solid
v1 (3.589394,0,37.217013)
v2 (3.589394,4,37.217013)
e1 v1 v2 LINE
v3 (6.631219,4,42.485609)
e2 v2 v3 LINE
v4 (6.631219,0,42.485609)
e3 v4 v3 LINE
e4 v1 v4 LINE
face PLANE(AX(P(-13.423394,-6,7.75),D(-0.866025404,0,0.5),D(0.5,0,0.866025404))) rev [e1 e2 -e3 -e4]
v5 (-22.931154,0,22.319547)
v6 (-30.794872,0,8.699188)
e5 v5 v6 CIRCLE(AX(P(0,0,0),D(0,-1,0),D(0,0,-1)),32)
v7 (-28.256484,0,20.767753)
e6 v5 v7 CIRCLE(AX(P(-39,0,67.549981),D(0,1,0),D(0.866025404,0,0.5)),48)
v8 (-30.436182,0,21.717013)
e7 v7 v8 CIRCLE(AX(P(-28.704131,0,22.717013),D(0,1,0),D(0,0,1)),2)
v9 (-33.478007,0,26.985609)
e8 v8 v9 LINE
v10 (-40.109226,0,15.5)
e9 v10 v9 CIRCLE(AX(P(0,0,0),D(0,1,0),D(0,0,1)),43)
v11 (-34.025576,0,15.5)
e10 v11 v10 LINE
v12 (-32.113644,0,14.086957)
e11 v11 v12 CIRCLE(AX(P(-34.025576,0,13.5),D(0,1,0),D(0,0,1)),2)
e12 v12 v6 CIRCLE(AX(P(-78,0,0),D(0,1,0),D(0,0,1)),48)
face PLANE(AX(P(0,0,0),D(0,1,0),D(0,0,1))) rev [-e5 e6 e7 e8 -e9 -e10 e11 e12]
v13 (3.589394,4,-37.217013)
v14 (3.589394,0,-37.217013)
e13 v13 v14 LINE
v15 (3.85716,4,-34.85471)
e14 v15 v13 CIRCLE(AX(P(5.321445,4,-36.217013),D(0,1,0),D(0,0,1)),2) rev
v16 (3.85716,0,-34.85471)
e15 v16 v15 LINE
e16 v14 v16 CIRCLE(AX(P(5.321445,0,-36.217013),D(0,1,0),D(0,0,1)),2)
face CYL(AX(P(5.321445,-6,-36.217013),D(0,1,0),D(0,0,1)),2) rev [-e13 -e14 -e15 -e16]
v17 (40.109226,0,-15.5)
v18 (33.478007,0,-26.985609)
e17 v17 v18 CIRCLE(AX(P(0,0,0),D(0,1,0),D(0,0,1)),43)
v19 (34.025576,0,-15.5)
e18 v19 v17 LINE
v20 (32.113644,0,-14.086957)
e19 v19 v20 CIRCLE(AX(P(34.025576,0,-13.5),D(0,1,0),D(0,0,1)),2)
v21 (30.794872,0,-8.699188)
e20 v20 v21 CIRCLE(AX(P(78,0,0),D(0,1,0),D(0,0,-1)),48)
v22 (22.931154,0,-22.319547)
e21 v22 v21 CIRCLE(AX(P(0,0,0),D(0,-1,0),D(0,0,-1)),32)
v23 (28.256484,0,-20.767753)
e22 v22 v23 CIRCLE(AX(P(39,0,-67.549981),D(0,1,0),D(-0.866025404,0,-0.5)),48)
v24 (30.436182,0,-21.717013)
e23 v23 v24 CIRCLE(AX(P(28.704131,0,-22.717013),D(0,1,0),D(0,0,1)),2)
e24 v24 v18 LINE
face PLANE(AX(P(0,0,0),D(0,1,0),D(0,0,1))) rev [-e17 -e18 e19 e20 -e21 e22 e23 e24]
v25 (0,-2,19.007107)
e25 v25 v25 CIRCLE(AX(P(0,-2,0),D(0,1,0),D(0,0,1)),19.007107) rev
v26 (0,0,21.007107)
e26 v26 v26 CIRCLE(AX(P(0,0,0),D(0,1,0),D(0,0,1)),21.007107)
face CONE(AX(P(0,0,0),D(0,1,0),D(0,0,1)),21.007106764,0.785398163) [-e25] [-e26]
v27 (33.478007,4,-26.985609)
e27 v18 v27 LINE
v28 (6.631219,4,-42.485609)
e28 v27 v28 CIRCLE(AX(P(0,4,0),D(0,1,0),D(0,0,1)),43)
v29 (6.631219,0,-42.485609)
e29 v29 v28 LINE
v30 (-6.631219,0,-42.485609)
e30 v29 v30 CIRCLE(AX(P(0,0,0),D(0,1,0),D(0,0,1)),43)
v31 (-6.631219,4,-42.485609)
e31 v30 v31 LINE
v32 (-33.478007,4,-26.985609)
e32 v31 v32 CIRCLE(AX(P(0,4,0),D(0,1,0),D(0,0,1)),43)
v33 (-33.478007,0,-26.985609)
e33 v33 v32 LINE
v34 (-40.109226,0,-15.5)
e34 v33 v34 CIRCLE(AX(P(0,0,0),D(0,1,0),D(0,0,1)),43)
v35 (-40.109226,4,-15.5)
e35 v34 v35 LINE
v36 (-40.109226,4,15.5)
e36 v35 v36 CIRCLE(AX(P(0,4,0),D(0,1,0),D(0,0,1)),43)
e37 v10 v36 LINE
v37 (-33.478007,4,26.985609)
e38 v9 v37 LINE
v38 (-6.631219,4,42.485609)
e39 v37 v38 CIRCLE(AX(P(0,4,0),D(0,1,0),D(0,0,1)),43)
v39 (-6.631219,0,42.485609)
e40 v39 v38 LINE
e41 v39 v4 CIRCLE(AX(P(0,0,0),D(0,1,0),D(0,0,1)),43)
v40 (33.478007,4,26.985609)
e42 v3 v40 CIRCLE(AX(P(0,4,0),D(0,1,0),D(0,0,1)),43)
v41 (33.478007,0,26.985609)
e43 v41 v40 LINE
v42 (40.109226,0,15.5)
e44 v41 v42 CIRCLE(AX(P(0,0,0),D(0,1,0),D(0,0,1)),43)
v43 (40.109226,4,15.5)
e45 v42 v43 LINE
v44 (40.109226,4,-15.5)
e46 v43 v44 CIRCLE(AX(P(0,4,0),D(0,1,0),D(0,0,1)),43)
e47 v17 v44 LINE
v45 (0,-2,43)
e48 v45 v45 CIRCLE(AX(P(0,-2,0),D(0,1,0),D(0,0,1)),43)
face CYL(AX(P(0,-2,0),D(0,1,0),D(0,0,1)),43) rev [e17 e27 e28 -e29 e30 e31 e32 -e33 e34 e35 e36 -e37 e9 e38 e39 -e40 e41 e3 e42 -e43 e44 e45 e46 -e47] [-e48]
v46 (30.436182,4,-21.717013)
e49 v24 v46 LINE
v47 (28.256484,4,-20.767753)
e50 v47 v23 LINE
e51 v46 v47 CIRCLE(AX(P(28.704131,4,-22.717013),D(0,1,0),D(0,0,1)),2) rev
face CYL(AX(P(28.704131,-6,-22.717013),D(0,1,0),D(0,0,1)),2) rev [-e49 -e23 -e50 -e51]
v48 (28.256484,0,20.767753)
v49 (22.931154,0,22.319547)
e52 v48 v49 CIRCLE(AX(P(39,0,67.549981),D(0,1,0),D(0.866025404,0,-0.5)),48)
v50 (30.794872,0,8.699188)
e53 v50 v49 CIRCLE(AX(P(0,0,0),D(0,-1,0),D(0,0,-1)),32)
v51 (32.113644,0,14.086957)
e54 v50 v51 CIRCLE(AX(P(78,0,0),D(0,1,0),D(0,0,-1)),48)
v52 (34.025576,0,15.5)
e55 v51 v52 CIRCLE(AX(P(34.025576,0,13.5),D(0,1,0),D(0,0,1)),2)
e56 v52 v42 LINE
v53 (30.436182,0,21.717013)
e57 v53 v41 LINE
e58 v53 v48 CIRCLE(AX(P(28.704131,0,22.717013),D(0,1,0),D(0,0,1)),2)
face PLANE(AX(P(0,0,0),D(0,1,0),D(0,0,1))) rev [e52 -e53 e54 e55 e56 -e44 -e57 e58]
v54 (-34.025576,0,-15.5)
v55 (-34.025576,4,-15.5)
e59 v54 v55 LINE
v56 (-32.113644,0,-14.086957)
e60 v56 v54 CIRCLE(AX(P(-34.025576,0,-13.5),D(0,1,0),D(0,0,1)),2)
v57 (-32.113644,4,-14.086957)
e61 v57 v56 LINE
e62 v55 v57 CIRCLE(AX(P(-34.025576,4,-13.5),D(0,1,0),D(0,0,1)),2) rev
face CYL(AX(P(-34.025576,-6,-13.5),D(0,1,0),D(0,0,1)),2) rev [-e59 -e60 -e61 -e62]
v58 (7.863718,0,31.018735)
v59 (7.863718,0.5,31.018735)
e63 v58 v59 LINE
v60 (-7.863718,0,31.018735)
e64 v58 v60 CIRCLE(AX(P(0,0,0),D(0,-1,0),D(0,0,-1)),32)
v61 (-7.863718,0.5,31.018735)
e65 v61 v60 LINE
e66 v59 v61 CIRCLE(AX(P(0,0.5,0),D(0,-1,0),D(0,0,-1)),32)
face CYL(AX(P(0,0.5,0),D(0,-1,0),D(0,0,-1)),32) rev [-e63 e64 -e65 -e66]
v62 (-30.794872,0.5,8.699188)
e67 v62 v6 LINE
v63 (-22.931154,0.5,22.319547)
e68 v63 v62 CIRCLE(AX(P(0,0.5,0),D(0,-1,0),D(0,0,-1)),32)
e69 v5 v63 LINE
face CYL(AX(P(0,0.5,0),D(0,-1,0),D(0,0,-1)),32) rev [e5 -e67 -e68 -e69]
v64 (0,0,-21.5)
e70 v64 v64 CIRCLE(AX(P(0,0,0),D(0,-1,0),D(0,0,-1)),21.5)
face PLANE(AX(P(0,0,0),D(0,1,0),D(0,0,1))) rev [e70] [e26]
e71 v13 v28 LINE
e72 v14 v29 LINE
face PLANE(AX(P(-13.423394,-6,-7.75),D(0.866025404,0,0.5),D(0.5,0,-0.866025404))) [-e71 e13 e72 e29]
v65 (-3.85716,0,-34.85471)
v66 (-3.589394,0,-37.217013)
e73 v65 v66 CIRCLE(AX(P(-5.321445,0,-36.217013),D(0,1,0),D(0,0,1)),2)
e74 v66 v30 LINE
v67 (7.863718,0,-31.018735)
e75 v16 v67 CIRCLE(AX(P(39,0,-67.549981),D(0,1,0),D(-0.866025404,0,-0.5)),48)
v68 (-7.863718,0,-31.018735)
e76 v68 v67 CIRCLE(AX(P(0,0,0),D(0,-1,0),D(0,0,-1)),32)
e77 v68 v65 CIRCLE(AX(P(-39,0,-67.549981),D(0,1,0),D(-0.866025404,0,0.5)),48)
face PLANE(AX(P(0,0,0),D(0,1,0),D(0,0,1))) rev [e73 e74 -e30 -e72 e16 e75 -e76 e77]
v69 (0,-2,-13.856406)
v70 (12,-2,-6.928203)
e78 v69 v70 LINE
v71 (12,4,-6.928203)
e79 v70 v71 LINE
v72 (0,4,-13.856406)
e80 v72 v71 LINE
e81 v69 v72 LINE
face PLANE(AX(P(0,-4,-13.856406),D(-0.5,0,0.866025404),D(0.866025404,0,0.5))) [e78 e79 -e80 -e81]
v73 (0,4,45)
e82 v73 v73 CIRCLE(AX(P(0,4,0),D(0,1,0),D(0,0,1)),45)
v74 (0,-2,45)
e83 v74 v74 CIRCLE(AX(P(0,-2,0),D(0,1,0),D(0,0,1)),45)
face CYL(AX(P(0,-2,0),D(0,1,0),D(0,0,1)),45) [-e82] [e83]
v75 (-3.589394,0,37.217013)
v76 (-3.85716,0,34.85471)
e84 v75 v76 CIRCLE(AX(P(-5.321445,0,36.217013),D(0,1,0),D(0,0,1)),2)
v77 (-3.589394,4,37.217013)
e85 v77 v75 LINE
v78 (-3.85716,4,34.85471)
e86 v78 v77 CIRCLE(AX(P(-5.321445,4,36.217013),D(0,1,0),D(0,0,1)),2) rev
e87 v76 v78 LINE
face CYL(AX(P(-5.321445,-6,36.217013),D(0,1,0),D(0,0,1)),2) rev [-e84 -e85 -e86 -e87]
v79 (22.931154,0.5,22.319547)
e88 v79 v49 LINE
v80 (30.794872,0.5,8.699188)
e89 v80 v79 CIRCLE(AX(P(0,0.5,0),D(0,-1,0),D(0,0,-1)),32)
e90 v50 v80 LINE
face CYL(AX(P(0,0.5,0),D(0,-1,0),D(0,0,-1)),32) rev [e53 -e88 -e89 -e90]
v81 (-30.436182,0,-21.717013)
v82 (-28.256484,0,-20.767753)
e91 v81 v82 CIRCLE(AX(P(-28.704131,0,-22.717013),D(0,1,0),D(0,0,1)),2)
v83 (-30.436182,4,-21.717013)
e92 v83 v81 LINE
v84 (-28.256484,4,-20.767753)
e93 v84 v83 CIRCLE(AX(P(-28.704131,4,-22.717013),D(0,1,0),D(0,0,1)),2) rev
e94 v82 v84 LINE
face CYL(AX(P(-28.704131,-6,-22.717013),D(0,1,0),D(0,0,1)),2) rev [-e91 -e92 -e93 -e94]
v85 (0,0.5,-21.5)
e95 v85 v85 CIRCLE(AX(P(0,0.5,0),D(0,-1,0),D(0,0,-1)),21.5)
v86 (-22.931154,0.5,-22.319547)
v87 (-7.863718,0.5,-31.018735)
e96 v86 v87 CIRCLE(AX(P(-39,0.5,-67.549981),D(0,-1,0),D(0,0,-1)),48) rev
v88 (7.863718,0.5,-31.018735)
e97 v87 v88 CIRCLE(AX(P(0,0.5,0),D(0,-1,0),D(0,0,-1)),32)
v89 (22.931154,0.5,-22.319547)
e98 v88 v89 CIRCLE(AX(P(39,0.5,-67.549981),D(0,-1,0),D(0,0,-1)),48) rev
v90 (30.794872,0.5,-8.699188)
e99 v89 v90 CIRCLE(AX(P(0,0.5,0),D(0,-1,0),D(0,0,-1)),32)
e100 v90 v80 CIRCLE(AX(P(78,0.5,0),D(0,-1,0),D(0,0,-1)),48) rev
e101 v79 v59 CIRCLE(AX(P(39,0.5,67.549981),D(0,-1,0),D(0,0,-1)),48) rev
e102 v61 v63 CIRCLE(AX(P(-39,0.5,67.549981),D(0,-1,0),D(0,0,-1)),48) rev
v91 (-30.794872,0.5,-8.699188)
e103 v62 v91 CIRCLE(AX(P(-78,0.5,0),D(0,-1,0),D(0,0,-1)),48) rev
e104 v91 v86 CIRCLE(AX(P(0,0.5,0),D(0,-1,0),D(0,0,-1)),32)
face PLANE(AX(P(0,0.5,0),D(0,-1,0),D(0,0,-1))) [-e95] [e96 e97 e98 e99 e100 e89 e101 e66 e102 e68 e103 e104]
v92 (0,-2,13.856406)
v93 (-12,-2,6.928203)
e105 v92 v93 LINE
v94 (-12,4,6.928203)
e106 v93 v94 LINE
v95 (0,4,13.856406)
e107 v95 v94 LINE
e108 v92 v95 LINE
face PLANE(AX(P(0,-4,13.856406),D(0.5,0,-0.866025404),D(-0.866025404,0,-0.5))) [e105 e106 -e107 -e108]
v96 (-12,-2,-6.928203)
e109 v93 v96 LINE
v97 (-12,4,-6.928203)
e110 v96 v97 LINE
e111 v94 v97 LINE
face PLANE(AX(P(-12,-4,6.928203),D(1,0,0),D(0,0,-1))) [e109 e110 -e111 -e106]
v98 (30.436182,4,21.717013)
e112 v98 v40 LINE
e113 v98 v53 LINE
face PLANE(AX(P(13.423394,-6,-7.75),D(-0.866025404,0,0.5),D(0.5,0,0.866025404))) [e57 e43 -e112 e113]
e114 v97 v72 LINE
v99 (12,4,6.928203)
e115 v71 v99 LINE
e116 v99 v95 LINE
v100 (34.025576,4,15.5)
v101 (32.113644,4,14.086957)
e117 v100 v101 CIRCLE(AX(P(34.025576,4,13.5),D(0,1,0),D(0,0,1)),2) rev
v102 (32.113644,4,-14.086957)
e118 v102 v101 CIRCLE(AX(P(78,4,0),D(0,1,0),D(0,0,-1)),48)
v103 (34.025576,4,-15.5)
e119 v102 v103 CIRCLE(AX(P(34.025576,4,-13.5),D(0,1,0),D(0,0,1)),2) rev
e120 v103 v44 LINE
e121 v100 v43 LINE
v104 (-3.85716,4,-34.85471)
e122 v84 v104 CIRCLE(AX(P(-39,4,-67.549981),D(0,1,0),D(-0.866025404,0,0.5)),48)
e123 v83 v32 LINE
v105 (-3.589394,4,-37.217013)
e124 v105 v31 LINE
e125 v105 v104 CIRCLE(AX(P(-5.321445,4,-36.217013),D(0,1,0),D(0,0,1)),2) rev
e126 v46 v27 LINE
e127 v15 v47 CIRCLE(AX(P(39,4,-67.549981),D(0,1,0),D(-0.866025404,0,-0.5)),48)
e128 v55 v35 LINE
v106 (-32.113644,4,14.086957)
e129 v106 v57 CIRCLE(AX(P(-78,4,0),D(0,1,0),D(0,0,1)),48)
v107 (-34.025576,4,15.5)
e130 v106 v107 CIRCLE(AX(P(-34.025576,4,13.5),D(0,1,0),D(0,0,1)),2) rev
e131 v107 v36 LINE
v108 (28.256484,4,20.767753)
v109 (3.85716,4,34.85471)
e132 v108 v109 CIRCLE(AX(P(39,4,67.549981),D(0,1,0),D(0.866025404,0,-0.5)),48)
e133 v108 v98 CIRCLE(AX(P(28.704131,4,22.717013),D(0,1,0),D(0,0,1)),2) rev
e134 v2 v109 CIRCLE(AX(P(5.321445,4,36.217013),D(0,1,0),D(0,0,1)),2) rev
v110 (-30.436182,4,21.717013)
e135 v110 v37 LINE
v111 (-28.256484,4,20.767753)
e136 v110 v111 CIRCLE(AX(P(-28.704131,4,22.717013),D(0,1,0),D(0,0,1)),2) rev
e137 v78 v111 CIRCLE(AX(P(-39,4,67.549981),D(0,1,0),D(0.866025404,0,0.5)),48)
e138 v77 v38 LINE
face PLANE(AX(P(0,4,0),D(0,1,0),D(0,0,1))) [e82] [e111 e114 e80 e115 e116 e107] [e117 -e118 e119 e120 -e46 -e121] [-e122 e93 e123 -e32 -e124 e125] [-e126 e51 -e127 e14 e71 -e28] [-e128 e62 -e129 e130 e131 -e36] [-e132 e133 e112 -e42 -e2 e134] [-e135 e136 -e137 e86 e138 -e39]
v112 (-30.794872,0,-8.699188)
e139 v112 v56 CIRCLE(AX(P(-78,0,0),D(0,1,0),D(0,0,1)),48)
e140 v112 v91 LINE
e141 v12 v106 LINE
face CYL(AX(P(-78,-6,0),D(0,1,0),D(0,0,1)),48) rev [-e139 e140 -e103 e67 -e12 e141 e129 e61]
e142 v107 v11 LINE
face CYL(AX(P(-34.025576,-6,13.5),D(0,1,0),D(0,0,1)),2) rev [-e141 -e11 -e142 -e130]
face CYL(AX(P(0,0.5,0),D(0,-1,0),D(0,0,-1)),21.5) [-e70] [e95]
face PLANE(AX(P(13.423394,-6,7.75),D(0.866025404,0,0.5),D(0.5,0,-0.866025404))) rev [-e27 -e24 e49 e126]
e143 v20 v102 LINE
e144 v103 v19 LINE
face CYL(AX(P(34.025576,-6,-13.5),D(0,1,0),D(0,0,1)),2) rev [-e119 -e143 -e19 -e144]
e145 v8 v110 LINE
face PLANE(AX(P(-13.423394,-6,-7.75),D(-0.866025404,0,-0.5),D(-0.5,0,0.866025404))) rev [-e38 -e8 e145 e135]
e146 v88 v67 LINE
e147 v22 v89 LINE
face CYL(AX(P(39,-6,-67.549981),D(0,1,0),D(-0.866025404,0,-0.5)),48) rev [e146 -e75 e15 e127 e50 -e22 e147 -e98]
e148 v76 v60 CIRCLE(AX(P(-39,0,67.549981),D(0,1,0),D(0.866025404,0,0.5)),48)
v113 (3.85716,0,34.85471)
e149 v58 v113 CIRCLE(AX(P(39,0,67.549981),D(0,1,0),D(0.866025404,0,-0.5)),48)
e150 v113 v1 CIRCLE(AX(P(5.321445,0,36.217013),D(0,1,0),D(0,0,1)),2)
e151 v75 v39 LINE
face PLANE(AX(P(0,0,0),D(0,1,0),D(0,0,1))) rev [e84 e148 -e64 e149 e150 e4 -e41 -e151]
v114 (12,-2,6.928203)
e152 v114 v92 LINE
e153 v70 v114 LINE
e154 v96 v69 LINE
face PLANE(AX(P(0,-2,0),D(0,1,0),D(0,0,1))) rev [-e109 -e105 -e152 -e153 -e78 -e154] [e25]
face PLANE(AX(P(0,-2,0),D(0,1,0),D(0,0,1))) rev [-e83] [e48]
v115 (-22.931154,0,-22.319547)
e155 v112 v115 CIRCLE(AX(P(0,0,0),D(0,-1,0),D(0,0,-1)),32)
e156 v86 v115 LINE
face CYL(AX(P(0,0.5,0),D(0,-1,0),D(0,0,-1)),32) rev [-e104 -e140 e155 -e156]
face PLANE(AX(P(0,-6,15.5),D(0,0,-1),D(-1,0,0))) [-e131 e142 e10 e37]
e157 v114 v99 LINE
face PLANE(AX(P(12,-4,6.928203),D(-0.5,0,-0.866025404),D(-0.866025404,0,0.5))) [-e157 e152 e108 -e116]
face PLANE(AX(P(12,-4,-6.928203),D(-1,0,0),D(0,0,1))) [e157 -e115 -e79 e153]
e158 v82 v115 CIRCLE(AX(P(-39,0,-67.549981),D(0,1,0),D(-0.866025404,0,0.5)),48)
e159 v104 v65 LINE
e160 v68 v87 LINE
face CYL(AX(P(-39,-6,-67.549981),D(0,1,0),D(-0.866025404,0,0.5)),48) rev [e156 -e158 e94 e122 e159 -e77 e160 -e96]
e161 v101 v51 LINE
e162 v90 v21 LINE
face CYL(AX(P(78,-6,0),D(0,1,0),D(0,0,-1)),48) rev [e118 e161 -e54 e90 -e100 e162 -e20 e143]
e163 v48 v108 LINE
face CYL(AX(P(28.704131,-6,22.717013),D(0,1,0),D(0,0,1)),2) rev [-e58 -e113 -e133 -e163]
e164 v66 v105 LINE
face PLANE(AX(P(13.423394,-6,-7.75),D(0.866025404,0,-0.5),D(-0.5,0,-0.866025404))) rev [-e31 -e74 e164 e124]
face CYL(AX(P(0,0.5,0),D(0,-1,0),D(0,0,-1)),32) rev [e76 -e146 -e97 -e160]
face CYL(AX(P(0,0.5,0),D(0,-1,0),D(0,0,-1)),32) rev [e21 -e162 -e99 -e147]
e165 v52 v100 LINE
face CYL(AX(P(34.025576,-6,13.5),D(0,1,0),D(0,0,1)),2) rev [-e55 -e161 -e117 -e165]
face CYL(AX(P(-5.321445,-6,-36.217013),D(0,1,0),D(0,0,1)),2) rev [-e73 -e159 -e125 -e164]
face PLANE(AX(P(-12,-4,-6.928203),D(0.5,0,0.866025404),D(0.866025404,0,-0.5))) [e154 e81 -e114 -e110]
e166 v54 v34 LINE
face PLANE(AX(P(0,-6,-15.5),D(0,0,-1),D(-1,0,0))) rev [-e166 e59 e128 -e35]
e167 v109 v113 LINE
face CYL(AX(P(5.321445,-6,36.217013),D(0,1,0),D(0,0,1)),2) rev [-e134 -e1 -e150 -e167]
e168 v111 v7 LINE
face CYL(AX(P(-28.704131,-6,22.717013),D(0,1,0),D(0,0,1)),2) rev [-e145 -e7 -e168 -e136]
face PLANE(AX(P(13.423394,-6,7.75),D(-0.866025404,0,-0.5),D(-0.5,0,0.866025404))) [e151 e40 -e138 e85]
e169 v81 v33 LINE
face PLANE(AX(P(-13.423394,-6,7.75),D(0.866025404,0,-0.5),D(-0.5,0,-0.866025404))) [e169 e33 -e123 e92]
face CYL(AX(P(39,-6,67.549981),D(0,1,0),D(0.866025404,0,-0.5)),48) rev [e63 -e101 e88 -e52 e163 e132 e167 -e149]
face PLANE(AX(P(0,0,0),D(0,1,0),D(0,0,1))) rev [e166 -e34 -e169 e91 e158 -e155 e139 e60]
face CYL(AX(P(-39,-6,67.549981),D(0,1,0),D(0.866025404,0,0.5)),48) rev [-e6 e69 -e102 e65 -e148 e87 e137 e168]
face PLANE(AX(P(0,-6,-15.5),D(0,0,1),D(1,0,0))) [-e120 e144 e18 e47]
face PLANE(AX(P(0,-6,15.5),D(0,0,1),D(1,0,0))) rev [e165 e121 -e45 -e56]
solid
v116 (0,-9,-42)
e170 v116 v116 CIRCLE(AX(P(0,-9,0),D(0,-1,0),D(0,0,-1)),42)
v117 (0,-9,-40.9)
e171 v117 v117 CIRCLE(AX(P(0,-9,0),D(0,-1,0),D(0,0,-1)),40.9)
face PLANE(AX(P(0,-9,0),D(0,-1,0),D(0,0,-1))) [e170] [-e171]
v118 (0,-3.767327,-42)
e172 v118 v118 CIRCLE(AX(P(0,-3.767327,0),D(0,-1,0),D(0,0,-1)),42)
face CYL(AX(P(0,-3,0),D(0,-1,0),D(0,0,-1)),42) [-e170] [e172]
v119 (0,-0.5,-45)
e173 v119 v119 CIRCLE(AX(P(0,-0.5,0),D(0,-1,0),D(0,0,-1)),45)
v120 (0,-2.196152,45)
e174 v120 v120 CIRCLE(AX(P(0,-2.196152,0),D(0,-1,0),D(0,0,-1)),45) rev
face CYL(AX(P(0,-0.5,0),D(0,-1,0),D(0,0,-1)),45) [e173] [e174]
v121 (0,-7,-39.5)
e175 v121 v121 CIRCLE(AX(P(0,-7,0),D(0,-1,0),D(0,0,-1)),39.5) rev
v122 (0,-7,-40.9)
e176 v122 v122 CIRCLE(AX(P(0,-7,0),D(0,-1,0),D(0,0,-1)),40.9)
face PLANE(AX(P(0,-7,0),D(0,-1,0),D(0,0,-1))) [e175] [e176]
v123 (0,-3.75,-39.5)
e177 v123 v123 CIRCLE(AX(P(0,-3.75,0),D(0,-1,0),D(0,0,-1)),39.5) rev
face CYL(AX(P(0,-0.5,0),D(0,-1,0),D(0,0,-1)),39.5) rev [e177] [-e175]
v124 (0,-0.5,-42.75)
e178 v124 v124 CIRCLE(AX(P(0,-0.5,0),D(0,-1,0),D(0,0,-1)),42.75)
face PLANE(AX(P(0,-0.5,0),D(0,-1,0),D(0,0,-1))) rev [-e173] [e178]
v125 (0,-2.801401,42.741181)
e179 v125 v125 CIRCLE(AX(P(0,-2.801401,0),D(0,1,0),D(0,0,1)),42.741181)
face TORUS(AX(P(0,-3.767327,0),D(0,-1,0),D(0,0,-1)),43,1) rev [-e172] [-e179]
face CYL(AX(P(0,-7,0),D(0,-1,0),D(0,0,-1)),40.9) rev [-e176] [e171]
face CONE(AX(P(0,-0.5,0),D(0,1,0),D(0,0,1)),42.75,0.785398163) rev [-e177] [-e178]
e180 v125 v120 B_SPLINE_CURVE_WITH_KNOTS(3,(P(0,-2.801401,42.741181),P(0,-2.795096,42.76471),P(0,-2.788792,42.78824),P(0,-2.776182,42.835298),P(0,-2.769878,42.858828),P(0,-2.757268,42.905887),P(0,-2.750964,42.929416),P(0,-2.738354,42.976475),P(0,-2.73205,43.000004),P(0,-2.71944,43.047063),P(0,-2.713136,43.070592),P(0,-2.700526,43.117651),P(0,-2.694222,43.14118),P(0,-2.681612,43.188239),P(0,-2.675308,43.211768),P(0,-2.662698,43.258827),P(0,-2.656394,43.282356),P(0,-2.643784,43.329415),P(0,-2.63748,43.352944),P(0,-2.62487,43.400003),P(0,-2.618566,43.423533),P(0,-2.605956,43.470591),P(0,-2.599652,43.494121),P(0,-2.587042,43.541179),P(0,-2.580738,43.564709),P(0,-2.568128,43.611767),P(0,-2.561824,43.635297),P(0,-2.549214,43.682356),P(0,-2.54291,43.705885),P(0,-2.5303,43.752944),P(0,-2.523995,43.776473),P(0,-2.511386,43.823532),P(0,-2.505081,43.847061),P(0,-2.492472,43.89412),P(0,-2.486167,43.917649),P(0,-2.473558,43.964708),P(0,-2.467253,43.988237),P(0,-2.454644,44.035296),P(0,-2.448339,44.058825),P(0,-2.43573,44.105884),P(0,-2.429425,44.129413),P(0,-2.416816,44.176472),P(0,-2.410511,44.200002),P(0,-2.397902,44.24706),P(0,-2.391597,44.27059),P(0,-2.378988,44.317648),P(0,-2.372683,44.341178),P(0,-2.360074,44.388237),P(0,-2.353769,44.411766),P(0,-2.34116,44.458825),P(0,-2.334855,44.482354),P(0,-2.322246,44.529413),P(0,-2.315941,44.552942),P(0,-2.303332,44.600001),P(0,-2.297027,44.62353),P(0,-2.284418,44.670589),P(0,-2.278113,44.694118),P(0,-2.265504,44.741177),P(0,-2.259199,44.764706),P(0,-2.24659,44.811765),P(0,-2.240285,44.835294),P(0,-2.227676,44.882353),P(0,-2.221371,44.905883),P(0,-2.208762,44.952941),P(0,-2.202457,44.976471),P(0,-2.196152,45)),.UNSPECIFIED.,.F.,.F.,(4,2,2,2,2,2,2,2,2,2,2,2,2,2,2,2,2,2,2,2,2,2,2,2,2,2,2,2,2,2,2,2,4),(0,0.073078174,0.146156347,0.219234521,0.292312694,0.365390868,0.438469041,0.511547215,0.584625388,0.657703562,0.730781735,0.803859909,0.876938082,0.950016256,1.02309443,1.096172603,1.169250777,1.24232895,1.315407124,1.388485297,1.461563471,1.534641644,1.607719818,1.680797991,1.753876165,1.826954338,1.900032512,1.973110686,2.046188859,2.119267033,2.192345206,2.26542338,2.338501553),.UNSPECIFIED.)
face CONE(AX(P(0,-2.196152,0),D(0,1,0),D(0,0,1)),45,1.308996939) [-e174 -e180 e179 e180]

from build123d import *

# Parameters (mm, degrees)
SKIZZE1_R                            = 44
AUFSATZ_LINEAR_AUSTRAGEN1_DEPTH      = 4
SCHNITT_LINEAR_START                 = -10
SCHNITT_LINEAR_AUSTRAGEN2_DEPTH      = 10
SKIZZE4_R                            = 21.007106764
AUFSATZ_LINEAR_AUSTRAGEN4_DEPTH      = 6
KREISMUSTER1_COUNT                   = 6
SCHNITT_LINEAR_AUSTRAGEN3_DEPTH      = 4
SCHNITT_LINEAR_AUSTRAGEN3_DEPTH_BACK = 10
VERRUNDUNG1_R                        = 2
SKIZZE8_R                            = 45
SKIZZE8_R_2                          = 43
AUFSATZ_LINEAR_AUSTRAGEN2_DEPTH      = 6
AUFSATZ_LINEAR_AUSTRAGEN3_DEPTH      = 7
AUFSATZ_LINEAR_AUSTRAGEN3_DEPTH_BACK = 1.5
SKIZZE9_R                            = 45
SKIZZE9_R_2                          = 39.5
FASE1_SIZE                           = 3.25
SKIZZE7_R                            = 32
SKIZZE7_R_2                          = 21.5
SCHNITT_LINEAR_AUSTRAGEN7_DEPTH      = 0.5
SKIZZE10_R                           = 50
SKIZZE10_R_2                         = 42
SCHNITT_LINEAR_AUSTRAGEN9_DEPTH      = 6
SKIZZE11_R                           = 40.9
SKIZZE11_R_2                         = 30
SCHNITT_LINEAR_AUSTRAGEN10_DEPTH     = 2
FASE2_SIZE                           = 0.803847577
FASE2_SIZE_2                         = 3
FASE3_SIZE                           = 2
VERRUNDUNG2_R                        = 1


# Some blends are built 0.0001 mm under size
with BuildPart() as part:
    # Skizze1 → Aufsatz-Linear austragen1 (new body)
    with BuildSketch(Plane(origin=(0, 0, 0), x_dir=(1, 0, 0), z_dir=(0, 1, 0))):
        with Locations(Location((0, 0, 0), (0, 0, 270))):
            Circle(SKIZZE1_R)
    extrude(amount=AUFSATZ_LINEAR_AUSTRAGEN1_DEPTH)

    # Skizze2 → Schnitt-Linear austragen2 (cut)
    with BuildSketch(Plane(origin=(0, 4, 0), x_dir=(1, 0, 0), z_dir=(0, 1, 0)).offset(SCHNITT_LINEAR_START)):
        with BuildLine():
            ThreePointArc((-30, 0), (-30.647234858, 7.855929826), (-32.571484726, 15.5))
            Line((-32.571484726, 15.5), (-41.179485184, 15.5))
            ThreePointArc((-41.179485184, 15.5), (-44, 0), (-41.179485184, -15.5))
            Line((-41.179485184, -15.5), (-32.571484726, -15.5))
            ThreePointArc((-32.571484726, -15.5), (-30.647234858, -7.855929826), (-30, 0))
        make_face()
    schnitt_linear_austragen2 = extrude(amount=SCHNITT_LINEAR_AUSTRAGEN2_DEPTH, mode=Mode.SUBTRACT)

    # Skizze4 → Aufsatz-Linear austragen4 (add)
    with BuildSketch(Plane(origin=(0, 4, 0), x_dir=(1, 0, 0), z_dir=(0, 1, 0))):
        with Locations(Location((0, 0, 0), (0, 0, 270))):
            Circle(SKIZZE4_R)
    extrude(amount=-AUFSATZ_LINEAR_AUSTRAGEN4_DEPTH)

    # Kreismuster1: Schnitt-Linear austragen2 ×6 about axis
    kreismuster1_axis = Axis((0, 0, 0), (0, 1, 0))
    for i in range(1, KREISMUSTER1_COUNT):
        add(schnitt_linear_austragen2.rotate(kreismuster1_axis, i * 360 / KREISMUSTER1_COUNT), mode=Mode.SUBTRACT)

    # Skizze3 → Schnitt-Linear austragen3 (cut, two sides: drawn at the far end of the back side and taken through both)
    with BuildSketch(Plane.XZ.offset(-SCHNITT_LINEAR_AUSTRAGEN3_DEPTH_BACK)):
        Polygon((12, 6.92820323), (0, 13.856406461), (-12, 6.92820323), (-12, -6.92820323), (0, -13.856406461), (12, -6.92820323), align=None)
    extrude(amount=SCHNITT_LINEAR_AUSTRAGEN3_DEPTH + SCHNITT_LINEAR_AUSTRAGEN3_DEPTH_BACK, mode=Mode.SUBTRACT)

    # Verrundung1
    verrundung1_edges = [part.edges().sort_by_distance(p)[0] for p in [
        (-32.571484726, 2, 15.5),
        (-32.571484726, 2, -15.5),
        (-29.709136122, 2, -20.457733212),
        (-2.862348604, 2, -35.957733212),
        (2.862348604, 2, -35.957733212),
        (29.709136122, 2, -20.457733212),
        (32.571484726, 2, -15.5),
        (32.571484726, 2, 15.5),
        (29.709136122, 2, 20.457733212),
        (2.862348604, 2, 35.957733212),
        (-2.862348604, 2, 35.957733212),
        (-29.709136122, 2, 20.457733212),
    ]]
    fillet(verrundung1_edges, radius=VERRUNDUNG1_R)

    # Skizze8 → Aufsatz-Linear austragen2 (add)
    with BuildSketch(Plane(origin=(0, 4, 0), x_dir=(1, 0, 0), z_dir=(0, 1, 0))):
        with Locations(Location((0, 0, 0), (0, 0, 270))):
            Circle(SKIZZE8_R)
        with Locations(Location((0, 0, 0), (0, 0, 270))):
            Circle(SKIZZE8_R_2, mode=Mode.SUBTRACT)
    extrude(amount=-AUFSATZ_LINEAR_AUSTRAGEN2_DEPTH)

    # Skizze7 → Schnitt-Linear austragen7 (cut)
    with BuildSketch(Plane.XZ):
        Circle(SKIZZE7_R)
        with Locations(Location((0, 0, 0), (0, 0, 270))):
            Circle(SKIZZE7_R_2, mode=Mode.SUBTRACT)
    extrude(amount=-SCHNITT_LINEAR_AUSTRAGEN7_DEPTH, mode=Mode.SUBTRACT)

    # Fase3
    fase3_edges = [part.edges().sort_by_distance(p)[0] for p in [
        (0, -2, -21.007106764),
    ]]
    chamfer(fase3_edges, length=FASE3_SIZE - 0.0001)  # a hair under: the kernel refuses the full size


with BuildPart() as body_2:
    # Skizze9 → Aufsatz-Linear austragen3 (new, two sides: drawn at the far end of the back side and taken through both)
    with BuildSketch(Plane.XZ.offset(2).offset(-AUFSATZ_LINEAR_AUSTRAGEN3_DEPTH_BACK)):
        with Locations(Location((0, 0, 0), (0, 0, 270))):
            Circle(SKIZZE9_R)
        with Locations(Location((0, 0, 0), (0, 0, 270))):
            Circle(SKIZZE9_R_2, mode=Mode.SUBTRACT)
    extrude(amount=AUFSATZ_LINEAR_AUSTRAGEN3_DEPTH + AUFSATZ_LINEAR_AUSTRAGEN3_DEPTH_BACK)

    # Fase1
    fase1_edges = [body_2.edges().sort_by_distance(p)[0] for p in [
        (0, -0.5, 39.5),
    ]]
    chamfer(fase1_edges, length=FASE1_SIZE)

    # Skizze10 → Schnitt-Linear austragen9 (cut)
    with BuildSketch(Plane.XZ.offset(9)):
        Circle(SKIZZE10_R)
        with Locations(Location((0, 0, 0), (0, 0, 270))):
            Circle(SKIZZE10_R_2, mode=Mode.SUBTRACT)
    extrude(amount=-SCHNITT_LINEAR_AUSTRAGEN9_DEPTH, mode=Mode.SUBTRACT)

    # Skizze11 → Schnitt-Linear austragen10 (cut)
    with BuildSketch(Plane.XZ.offset(9)):
        with Locations(Location((0, 0, 0), (0, 0, 270))):
            Circle(SKIZZE11_R)
        with Locations((-1.948563864, 1.772578218)):
            Circle(SKIZZE11_R_2, mode=Mode.SUBTRACT)
    extrude(amount=-SCHNITT_LINEAR_AUSTRAGEN10_DEPTH, mode=Mode.SUBTRACT)

    # Fase2
    # the kernel refuses this chamfer: 3, 0.803847577 mm, written as the material it takes off along each edge
    with BuildSketch(Plane(origin=(0, -3, 0), x_dir=(0, 0, -1), z_dir=(-1, 0, 0))) as fase2_piece_1_section:
        Polygon((45, -FASE2_SIZE), (45 - FASE2_SIZE_2, 0), (45, 0), align=None)
    fase2_piece_1 = revolve(axis=Axis((0, -3, 0), (0, -1, 0)), mode=Mode.PRIVATE)
    fase2_piece_1 = fase2_piece_1 - Plane(origin=(0, -2.653988874, 0), x_dir=(0, 0, -1), z_dir=(0, -1, 0)) * Cylinder(42, 180, mode=Mode.PRIVATE)
    add(fase2_piece_1, mode=Mode.SUBTRACT)

    # Verrundung2
    verrundung2_edges = [body_2.edges().sort_by_distance(p)[0] for p in [
        (0, -3, 42),
    ]]
    fillet(verrundung2_edges, radius=VERRUNDUNG2_R)


solid = Compound([part.part, body_2.part])
